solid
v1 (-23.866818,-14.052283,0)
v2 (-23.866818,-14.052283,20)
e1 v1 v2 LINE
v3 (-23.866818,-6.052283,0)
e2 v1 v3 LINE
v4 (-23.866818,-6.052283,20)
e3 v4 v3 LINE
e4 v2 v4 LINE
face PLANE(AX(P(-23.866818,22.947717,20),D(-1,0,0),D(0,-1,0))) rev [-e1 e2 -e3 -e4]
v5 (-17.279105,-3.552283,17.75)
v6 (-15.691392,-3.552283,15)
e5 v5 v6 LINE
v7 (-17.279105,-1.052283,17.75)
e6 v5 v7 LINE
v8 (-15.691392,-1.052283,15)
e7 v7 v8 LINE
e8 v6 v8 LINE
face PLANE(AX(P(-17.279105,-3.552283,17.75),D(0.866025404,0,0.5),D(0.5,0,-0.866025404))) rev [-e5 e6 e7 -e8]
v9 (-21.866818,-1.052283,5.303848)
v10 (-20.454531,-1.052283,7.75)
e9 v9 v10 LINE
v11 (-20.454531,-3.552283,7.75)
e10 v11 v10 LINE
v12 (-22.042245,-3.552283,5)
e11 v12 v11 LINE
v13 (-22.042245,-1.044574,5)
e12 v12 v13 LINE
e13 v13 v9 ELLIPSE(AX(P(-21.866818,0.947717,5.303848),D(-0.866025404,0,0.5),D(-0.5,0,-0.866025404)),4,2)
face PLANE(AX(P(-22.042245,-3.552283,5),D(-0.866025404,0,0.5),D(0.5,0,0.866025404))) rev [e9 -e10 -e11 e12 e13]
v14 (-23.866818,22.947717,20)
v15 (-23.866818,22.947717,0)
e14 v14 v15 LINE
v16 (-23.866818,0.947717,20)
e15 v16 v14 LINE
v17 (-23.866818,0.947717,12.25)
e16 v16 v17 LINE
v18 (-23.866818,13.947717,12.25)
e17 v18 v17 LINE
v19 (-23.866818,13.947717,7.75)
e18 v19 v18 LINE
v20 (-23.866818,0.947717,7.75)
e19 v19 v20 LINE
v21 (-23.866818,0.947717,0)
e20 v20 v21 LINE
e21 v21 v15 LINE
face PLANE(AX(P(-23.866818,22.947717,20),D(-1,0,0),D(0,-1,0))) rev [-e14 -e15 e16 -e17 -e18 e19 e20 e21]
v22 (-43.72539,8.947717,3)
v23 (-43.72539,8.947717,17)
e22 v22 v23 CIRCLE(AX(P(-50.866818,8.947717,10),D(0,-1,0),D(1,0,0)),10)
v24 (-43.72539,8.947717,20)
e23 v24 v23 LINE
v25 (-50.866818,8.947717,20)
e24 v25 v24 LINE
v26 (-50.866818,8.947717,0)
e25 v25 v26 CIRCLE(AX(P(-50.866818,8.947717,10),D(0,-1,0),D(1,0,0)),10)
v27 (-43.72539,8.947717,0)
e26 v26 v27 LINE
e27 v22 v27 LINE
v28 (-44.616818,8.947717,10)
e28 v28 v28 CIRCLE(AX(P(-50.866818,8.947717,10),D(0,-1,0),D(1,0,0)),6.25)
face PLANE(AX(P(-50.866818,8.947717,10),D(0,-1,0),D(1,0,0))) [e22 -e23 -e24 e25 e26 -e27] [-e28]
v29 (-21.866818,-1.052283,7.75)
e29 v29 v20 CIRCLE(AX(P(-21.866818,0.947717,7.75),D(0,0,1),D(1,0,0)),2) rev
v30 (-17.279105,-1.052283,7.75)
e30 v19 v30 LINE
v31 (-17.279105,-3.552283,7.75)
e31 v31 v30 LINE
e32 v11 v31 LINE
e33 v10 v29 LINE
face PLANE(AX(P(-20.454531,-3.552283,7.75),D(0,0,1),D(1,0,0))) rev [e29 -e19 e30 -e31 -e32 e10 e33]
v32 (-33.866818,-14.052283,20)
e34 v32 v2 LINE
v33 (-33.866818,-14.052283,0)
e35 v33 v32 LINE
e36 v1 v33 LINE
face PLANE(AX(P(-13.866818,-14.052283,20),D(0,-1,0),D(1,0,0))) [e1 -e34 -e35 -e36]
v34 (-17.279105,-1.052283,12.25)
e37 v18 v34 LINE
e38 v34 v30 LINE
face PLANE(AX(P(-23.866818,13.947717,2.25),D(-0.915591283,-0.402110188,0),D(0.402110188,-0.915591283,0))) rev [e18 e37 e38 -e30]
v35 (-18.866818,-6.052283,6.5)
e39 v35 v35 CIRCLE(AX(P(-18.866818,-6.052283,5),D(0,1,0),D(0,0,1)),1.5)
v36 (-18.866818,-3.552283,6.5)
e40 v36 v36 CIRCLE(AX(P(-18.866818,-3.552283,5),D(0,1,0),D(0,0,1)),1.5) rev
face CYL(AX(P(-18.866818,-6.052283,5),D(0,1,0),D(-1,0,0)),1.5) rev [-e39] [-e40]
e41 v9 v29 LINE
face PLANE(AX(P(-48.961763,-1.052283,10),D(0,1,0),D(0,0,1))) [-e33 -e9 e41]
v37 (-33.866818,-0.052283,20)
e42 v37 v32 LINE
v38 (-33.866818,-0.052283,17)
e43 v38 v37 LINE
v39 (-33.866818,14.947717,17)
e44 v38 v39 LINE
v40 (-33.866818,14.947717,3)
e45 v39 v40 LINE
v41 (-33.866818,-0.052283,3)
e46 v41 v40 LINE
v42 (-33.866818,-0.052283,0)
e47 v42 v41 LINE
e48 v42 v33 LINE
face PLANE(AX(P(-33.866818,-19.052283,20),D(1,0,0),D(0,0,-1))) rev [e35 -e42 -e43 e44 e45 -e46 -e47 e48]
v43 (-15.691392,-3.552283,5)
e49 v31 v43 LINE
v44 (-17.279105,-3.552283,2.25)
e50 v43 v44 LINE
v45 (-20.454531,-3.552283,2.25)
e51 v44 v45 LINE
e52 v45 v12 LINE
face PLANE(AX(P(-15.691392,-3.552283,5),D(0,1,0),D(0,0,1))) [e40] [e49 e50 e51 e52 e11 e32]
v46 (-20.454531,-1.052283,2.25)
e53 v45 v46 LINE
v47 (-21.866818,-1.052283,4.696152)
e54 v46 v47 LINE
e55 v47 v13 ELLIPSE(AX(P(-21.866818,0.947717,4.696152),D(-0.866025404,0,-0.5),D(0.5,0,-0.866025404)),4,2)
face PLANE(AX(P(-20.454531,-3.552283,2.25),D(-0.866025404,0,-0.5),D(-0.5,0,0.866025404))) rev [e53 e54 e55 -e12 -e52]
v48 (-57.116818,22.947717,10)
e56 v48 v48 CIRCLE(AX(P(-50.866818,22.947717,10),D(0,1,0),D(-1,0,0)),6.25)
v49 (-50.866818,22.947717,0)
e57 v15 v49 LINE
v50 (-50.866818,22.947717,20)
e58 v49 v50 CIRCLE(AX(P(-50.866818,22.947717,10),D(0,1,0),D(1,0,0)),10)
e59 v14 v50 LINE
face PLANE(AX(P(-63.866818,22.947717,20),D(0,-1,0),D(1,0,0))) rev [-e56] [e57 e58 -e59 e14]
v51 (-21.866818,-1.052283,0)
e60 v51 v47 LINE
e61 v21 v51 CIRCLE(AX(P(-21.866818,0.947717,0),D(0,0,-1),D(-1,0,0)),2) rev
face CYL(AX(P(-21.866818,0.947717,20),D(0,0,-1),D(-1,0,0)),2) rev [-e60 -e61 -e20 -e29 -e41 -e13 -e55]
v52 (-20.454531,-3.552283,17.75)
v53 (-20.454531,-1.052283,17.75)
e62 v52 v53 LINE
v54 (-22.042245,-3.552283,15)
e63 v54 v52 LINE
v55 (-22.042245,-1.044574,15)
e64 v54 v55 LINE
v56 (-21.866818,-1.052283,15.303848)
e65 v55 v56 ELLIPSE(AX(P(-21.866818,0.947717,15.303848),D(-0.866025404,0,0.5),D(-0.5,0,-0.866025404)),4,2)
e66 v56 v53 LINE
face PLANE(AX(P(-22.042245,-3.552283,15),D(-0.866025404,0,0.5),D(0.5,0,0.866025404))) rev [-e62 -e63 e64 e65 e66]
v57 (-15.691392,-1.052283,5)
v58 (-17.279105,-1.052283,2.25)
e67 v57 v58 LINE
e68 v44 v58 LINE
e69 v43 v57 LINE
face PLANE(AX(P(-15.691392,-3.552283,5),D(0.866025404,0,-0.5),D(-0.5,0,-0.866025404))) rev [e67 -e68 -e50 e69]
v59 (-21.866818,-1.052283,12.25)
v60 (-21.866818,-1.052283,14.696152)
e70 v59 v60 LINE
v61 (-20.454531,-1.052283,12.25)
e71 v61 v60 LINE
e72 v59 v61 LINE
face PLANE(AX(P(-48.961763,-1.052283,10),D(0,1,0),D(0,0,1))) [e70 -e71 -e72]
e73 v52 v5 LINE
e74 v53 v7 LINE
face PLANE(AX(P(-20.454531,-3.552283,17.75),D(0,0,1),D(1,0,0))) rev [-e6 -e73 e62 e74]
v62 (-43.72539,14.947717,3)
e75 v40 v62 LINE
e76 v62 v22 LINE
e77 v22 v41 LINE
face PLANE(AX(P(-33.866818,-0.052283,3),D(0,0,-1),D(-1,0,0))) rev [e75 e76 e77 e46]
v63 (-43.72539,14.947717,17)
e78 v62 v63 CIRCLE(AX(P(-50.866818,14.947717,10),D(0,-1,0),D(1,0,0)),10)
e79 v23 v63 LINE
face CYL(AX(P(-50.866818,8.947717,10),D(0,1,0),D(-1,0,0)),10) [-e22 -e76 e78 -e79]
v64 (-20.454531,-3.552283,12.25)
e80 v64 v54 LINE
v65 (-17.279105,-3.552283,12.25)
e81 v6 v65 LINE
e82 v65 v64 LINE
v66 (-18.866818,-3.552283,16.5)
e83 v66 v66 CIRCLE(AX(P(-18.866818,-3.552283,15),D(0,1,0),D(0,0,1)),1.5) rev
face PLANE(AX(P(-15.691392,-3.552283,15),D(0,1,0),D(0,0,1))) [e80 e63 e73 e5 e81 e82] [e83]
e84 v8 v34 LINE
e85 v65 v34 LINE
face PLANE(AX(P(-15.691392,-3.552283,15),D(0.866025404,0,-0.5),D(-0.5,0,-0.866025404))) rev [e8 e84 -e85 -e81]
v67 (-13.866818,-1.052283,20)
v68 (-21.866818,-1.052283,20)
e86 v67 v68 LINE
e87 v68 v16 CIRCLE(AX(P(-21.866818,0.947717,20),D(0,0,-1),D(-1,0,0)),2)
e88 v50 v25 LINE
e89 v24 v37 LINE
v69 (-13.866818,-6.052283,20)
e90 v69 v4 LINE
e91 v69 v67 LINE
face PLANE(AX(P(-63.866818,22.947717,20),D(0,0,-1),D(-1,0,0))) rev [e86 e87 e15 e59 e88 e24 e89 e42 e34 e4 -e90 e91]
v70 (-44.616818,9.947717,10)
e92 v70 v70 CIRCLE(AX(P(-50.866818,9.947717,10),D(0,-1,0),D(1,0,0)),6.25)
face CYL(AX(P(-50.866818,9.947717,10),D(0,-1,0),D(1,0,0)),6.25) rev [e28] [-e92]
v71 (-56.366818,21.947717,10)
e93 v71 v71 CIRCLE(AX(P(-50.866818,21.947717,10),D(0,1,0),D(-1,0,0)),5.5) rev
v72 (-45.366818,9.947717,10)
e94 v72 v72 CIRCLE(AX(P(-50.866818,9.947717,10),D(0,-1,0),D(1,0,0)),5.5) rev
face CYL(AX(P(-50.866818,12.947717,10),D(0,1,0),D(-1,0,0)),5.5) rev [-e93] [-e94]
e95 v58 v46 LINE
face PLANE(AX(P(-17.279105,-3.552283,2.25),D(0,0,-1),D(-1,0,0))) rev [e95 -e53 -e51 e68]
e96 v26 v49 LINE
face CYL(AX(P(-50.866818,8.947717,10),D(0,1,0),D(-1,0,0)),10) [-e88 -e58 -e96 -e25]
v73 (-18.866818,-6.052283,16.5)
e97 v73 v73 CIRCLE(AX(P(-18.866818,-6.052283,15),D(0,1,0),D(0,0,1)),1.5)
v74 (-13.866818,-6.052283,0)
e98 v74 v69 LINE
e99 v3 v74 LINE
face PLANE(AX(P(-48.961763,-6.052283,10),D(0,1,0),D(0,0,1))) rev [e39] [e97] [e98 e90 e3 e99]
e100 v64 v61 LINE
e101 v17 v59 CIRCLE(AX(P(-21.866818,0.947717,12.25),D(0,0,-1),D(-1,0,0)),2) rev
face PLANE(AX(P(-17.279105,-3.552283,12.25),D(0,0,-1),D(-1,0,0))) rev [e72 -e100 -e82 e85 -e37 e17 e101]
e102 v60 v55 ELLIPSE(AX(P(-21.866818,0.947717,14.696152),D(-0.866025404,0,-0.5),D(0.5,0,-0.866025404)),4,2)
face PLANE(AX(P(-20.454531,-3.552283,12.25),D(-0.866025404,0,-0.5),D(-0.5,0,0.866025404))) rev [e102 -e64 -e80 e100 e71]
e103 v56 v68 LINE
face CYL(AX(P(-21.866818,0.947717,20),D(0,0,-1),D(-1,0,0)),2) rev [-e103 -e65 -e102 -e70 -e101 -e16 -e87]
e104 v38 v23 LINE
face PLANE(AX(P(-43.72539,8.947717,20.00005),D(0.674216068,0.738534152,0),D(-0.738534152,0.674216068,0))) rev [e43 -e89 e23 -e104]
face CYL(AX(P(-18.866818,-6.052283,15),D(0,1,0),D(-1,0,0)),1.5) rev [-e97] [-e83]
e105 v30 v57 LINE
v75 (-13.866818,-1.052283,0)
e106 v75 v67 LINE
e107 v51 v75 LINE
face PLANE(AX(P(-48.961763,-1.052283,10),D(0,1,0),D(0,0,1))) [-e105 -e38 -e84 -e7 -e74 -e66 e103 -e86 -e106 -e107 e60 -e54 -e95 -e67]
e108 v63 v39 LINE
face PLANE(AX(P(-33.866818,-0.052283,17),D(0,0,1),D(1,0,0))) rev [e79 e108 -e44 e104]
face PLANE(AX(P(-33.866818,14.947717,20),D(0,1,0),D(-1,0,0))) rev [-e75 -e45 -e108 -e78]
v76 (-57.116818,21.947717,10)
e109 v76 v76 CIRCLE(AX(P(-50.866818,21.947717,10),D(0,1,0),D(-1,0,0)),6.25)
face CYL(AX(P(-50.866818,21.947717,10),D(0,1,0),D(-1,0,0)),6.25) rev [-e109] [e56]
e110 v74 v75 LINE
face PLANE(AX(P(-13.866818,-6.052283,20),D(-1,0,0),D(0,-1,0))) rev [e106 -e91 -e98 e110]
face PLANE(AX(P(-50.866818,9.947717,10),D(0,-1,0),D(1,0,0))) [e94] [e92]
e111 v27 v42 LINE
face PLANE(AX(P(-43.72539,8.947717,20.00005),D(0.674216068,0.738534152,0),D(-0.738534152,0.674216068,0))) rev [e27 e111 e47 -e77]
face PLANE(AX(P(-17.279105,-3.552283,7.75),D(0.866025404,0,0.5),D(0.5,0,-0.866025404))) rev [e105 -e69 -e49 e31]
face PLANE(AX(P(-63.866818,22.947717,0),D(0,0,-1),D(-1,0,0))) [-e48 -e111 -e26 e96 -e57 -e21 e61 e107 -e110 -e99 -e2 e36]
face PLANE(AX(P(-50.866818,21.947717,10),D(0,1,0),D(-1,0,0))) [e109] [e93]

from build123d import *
from build123d.topology import SkipClean

# Parameters (mm, degrees)
EXTRUDE_1_DEPTH           = 20
SKETCH_3_R                = 5.5
CUT_EXTRUDE_2_DEPTH       = 10
SKETCH_9_R                = 6.25
CUT_EXTRUDE_6_DEPTH       = 1
SKETCH_11_W               = 20
SKETCH_11_H               = 5
EXTRUDE_4_DEPTH           = 10
CUT_EXTRUDE_8_REACH       = 78.472
SKETCH_12_R               = 1.5
SKETCH_13_R               = 3
CUT_EXTRUDE_9_DEPTH       = 2.5
SKETCH_14_R               = 10
SKETCH_14_R_2             = 5.5
EXTRUDE_5_DEPTH           = 6
CUT_EXTRUDE_START         = -1
SKETCH_6_R                = 6.25
CUT_EXTRUDE_10_DEPTH      = 1
SKETCH_15_W               = 20
SKETCH_15_H               = 5
EXTRUDE_6_DEPTH           = 5
SKETCH_16_W               = 17
SKETCH_16_H               = 3
EXTRUDE_7_DEPTH           = 15
CUT_EXTRUDE_11_DEPTH      = 70.961190435
CUT_EXTRUDE_11_DEPTH_BACK = 70.961190435
EXTRUDE_START             = -5
SKETCH_3D_3_R             = 1.5
EXTRUDE_8_DEPTH           = 5
CUT_EXTRUDE_12_DEPTH      = 2.5
FILLET_1_R                = 2
CUT_EXTRUDE_14_DEPTH      = 76.06644022
SKETCH_21_W               = 6.587713241
SKETCH_21_H               = 4.5
EXTRUDE_9_DEPTH           = 15
SKETCH_23_W               = 25
SKETCH_23_H               = 20
CUT_EXTRUDE_16_DEPTH      = 5
CUT_EXTRUDE_17_DEPTH      = 10


with BuildPart() as part:
    # 草图1 → 凸台-拉伸1 (new body)
    with BuildSketch(Plane.XY):
        Polygon((-63.866818046, 22.947717095), (-23.866818046, 22.947717095), (-23.866818046, -19.052282905), (-33.866818046, -19.052282905), (-33.866818046, 14.947717095), (-63.866818046, 14.947717095), align=None)
    extrude(amount=EXTRUDE_1_DEPTH)

    # 草图3 → 切除-拉伸2 (cut)
    with BuildSketch(Plane(origin=(0, 22.947717095, 0), x_dir=(-1, 0, 0), z_dir=(0, 1, 0))):
        with Locations((50.866818046, 10)):
            Circle(SKETCH_3_R)
    extrude(amount=-CUT_EXTRUDE_2_DEPTH, mode=Mode.SUBTRACT)

    # 草图9 → 切除-拉伸6 (cut)
    with BuildSketch(Plane(origin=(0, 22.947717095, 0), x_dir=(1, 0, 0), z_dir=(0, 1, 0))):
        with Locations(Location((-50.866818046, -10, 0), (0, 0, 180))):
            Circle(SKETCH_9_R)
    extrude(amount=-CUT_EXTRUDE_6_DEPTH, mode=Mode.SUBTRACT)

    # 草图11 → 凸台-拉伸4 (add)
    with BuildSketch(Plane(origin=(-23.866818046, 0, 0), x_dir=(0, 0, -1), z_dir=(1, 0, 0))):
        with Locations((-10, -16.552282905)):
            Rectangle(SKETCH_11_W, SKETCH_11_H)
    extrude(amount=EXTRUDE_4_DEPTH)

    # 草图12 → 切除-拉伸8 (cut, up to next)
    with BuildSketch(Plane(origin=(0, -14.052282905, 0), x_dir=(-1, 0, 0), z_dir=(0, 1, 0)), mode=Mode.PRIVATE) as cut_extrude_8_sk1:
        with Locations((18.866818046, 5)):
            Circle(SKETCH_12_R)
    cut_extrude_8_tool1 = extrude(cut_extrude_8_sk1.sketch, amount=-CUT_EXTRUDE_8_REACH, mode=Mode.PRIVATE) & part.part
    # 草图12 → 切除-拉伸8 (cut, up to next)
    with BuildSketch(Plane(origin=(0, -14.052282905, 0), x_dir=(-1, 0, 0), z_dir=(0, 1, 0)), mode=Mode.PRIVATE) as cut_extrude_8_sk2:
        with Locations((18.866818046, 15)):
            Circle(SKETCH_12_R)
    cut_extrude_8_tool2 = extrude(cut_extrude_8_sk2.sketch, amount=-CUT_EXTRUDE_8_REACH, mode=Mode.PRIVATE) & part.part
    add(cut_extrude_8_tool1.solids().sort_by_distance((-18.866818, -14.052283, 5))[0], mode=Mode.SUBTRACT)
    add(cut_extrude_8_tool2.solids().sort_by_distance((-18.866818, -14.052283, 15))[0], mode=Mode.SUBTRACT)

    # 草图13 → 切除-拉伸9 (cut)
    with BuildSketch(Plane.XZ.offset(19.052282905)):
        with Locations(Location((-18.866818046, 15, 0), (0, 0, 270))):
            Circle(SKETCH_13_R)
        with Locations(Location((-18.866818046, 5, 0), (0, 0, 270))):
            Circle(SKETCH_13_R)
    extrude(amount=-CUT_EXTRUDE_9_DEPTH, mode=Mode.SUBTRACT)

    # 草图14 → 凸台-拉伸5 (add)
    with SkipClean():  # the faces are left unmerged after this step: merging them gives an invalid solid
        with BuildSketch(Plane.XZ.offset(-14.947717095)):
            with Locations(Location((-50.866818046, 10, 0), (0, 0, 270))):
                Circle(SKETCH_14_R)
            with Locations(Location((-50.866818046, 10, 0), (0, 0, 180))):
                Circle(SKETCH_14_R_2, mode=Mode.SUBTRACT)
        extrude(amount=EXTRUDE_5_DEPTH)

    # 草图6 → 切除-拉伸10 (cut)
    with BuildSketch(Plane.XZ.offset(-8.947717095).offset(CUT_EXTRUDE_START)):
        with Locations(Location((-50.866818046, 10, 0), (0, 0, 180))):
            Circle(SKETCH_6_R)
    extrude(amount=CUT_EXTRUDE_10_DEPTH, mode=Mode.SUBTRACT)

    # 草图15 → 凸台-拉伸6 (add)
    with BuildSketch(Plane(origin=(-13.866818046, 0, 0), x_dir=(0, 0, -1), z_dir=(1, 0, 0))):
        with Locations((-10, -16.552282905)):
            Rectangle(SKETCH_15_W, SKETCH_15_H)
    extrude(amount=EXTRUDE_6_DEPTH)

    # 草图16 → 凸台-拉伸7 (add)
    with BuildSketch(Plane.XZ.offset(-14.947717095)):
        with Locations((-42.366818046, 18.5)):
            Rectangle(SKETCH_16_W, SKETCH_16_H)
        with Locations((-42.366818046, 1.5)):
            Rectangle(SKETCH_16_W, SKETCH_16_H)
    extrude(amount=EXTRUDE_7_DEPTH)

    # 草图17 → 切除-拉伸11 (cut, two sides: drawn at the far end of the back side and taken through both)
    with BuildSketch(Plane(origin=(0, 0, 17), x_dir=(-1, 0, 0), z_dir=(0, 0, -1)).offset(-CUT_EXTRUDE_11_DEPTH_BACK)):
        Polygon((50.866818046, 8.947717095), (43.725389617, 8.947717095), (33.866818046, -0.052282905), (50.866818046, -0.052282905), align=None)
    extrude(amount=CUT_EXTRUDE_11_DEPTH + CUT_EXTRUDE_11_DEPTH_BACK, mode=Mode.SUBTRACT)

    # Sketch 3D_3 → 凸台-拉伸8 (add)
    with BuildSketch(Plane(origin=(-23.866818046, -6.052282905, 20), x_dir=(0.447213595499958, 0, -0.894427190999916), z_dir=(0, -1, 0)).offset(EXTRUDE_START)):
        Polygon((0, 0), (4.472135955, 8.94427191), (22.360679775, 0), (17.88854382, -8.94427191), align=None)
        with Locations(Location((6.708203932, 2.236067977, 0), (0, 0, 243.434948823))):
            Circle(SKETCH_3D_3_R, mode=Mode.SUBTRACT)
        with Locations(Location((15.652475842, -2.236067977, 0), (0, 0, 243.434948823))):
            Circle(SKETCH_3D_3_R, mode=Mode.SUBTRACT)
    extrude(amount=EXTRUDE_8_DEPTH)

    # 草图18 → 切除-拉伸12 (cut)
    with BuildSketch(Plane(origin=(0, -1.052282905, 0), x_dir=(-1, 0, 0), z_dir=(0, 1, 0))):
        Polygon((15.691391565, 15), (17.279104805, 12.25), (20.454531286, 12.25), (22.042244526, 15), (20.454531286, 17.75), (17.279104805, 17.75), align=None)
        Polygon((15.691391565, 5), (17.279104805, 2.25), (20.454531286, 2.25), (22.042244526, 5), (20.454531286, 7.75), (17.279104805, 7.75), align=None)
    extrude(amount=-CUT_EXTRUDE_12_DEPTH, mode=Mode.SUBTRACT)

    # 圆角1
    # the kernel refuses this fillet: 2 mm, written as the material it adds along each edge
    with BuildSketch(Plane(origin=(-23.866818046, -1.052282905, 0), x_dir=(0, 1, 0), z_dir=(0, 0, 1))) as fillet_1_piece_1_section:
        with BuildLine():
            CenterArc((FILLET_1_R, -FILLET_1_R), FILLET_1_R, 90, 90)
            Line((0, -FILLET_1_R), (0, 0))
            Line((0, 0), (FILLET_1_R, 0))
        make_face()
    fillet_1_piece_1 = extrude(amount=20, mode=Mode.PRIVATE)
    fillet_1_piece_1 = split(fillet_1_piece_1, bisect_by=Plane(origin=(-20.802583542, -0.671658343, 2.852844192), z_dir=(-0.8660254037844387, 0, -0.5000000000000001)), keep=Keep.TOP, mode=Mode.PRIVATE)
    fillet_1_piece_1 = split(fillet_1_piece_1, bisect_by=Plane(origin=(-23.907001975, -0.671658343, 1.770145354), z_dir=(0.8660254037844387, 0, -0.5000000000000003)), keep=Keep.TOP, mode=Mode.PRIVATE)
    add(fillet_1_piece_1)
    with BuildSketch(Plane(origin=(-23.866818046, -1.052282905, 0), x_dir=(0, 1, 0), z_dir=(0, 0, 1))) as fillet_1_piece_2_section:
        with BuildLine():
            CenterArc((FILLET_1_R, -FILLET_1_R), FILLET_1_R, 90, 90)
            Line((0, -FILLET_1_R), (0, 0))
            Line((0, 0), (FILLET_1_R, 0))
        make_face()
    fillet_1_piece_2 = extrude(amount=20, mode=Mode.PRIVATE)
    fillet_1_piece_2 = split(fillet_1_piece_2, bisect_by=Plane(origin=(-22.4188867, -0.519681884, 5.652363381), z_dir=(-0.8660254037844387, 0, -0.5000000000000001)), keep=Keep.TOP, mode=Mode.PRIVATE)
    fillet_1_piece_2 = split(fillet_1_piece_2, bisect_by=Plane(origin=(-22.4188867, -0.519681884, 4.347636619), z_dir=(-0.8660254037844387, 0, 0.5000000000000003)), keep=Keep.TOP, mode=Mode.PRIVATE)
    add(fillet_1_piece_2)
    with BuildSketch(Plane(origin=(-23.866818046, -1.052282905, 0), x_dir=(0, 1, 0), z_dir=(0, 0, 1))) as fillet_1_piece_3_section:
        with BuildLine():
            CenterArc((FILLET_1_R, -FILLET_1_R), FILLET_1_R, 90, 90)
            Line((0, -FILLET_1_R), (0, 0))
            Line((0, 0), (FILLET_1_R, 0))
        make_face()
    fillet_1_piece_3 = extrude(amount=20, mode=Mode.PRIVATE)
    fillet_1_piece_3 = split(fillet_1_piece_3, bisect_by=Plane(origin=(-24.519856268, -0.671658343, 9.291349419), z_dir=(0.8660254037844387, 0, 0.5000000000000001)), keep=Keep.TOP, mode=Mode.PRIVATE)
    fillet_1_piece_3 = split(fillet_1_piece_3, bisect_by=Plane(origin=(-20.189729249, -0.671658343, 8.208650581), z_dir=(-0.8660254037844387, 0, 0.5000000000000003)), keep=Keep.TOP, mode=Mode.PRIVATE)
    fillet_1_piece_3 = split(fillet_1_piece_3, bisect_by=Plane(origin=(-20.189729249, -0.671658343, 11.791349419), z_dir=(-0.8660254037844387, 0, -0.5)), keep=Keep.TOP, mode=Mode.PRIVATE)
    fillet_1_piece_3 = split(fillet_1_piece_3, bisect_by=Plane(origin=(-24.519856268, -0.671658343, 10.708650581), z_dir=(0.8660254037844384, 0, -0.5000000000000004)), keep=Keep.TOP, mode=Mode.PRIVATE)
    add(fillet_1_piece_3)
    with BuildSketch(Plane(origin=(-23.866818046, -1.052282905, 0), x_dir=(0, 1, 0), z_dir=(0, 0, 1))) as fillet_1_piece_4_section:
        with BuildLine():
            CenterArc((FILLET_1_R, -FILLET_1_R), FILLET_1_R, 90, 90)
            Line((0, -FILLET_1_R), (0, 0))
            Line((0, 0), (FILLET_1_R, 0))
        make_face()
    fillet_1_piece_4 = extrude(amount=20, mode=Mode.PRIVATE)
    fillet_1_piece_4 = split(fillet_1_piece_4, bisect_by=Plane(origin=(-22.4188867, -0.519681884, 15.652363381), z_dir=(-0.8660254037844387, 0, -0.5)), keep=Keep.TOP, mode=Mode.PRIVATE)
    fillet_1_piece_4 = split(fillet_1_piece_4, bisect_by=Plane(origin=(-22.4188867, -0.519681884, 14.347636619), z_dir=(-0.8660254037844384, 0, 0.5000000000000004)), keep=Keep.TOP, mode=Mode.PRIVATE)
    add(fillet_1_piece_4)
    with BuildSketch(Plane(origin=(-23.866818046, -1.052282905, 0), x_dir=(0, 1, 0), z_dir=(0, 0, 1))) as fillet_1_piece_5_section:
        with BuildLine():
            CenterArc((FILLET_1_R, -FILLET_1_R), FILLET_1_R, 90, 90)
            Line((0, -FILLET_1_R), (0, 0))
            Line((0, 0), (FILLET_1_R, 0))
        make_face()
    fillet_1_piece_5 = extrude(amount=20, mode=Mode.PRIVATE)
    fillet_1_piece_5 = split(fillet_1_piece_5, bisect_by=Plane(origin=(-23.907001975, -0.671658343, 18.229854646), z_dir=(0.8660254037844387, 0, 0.5)), keep=Keep.TOP, mode=Mode.PRIVATE)
    fillet_1_piece_5 = split(fillet_1_piece_5, bisect_by=Plane(origin=(-20.802583542, -0.671658343, 17.147155808), z_dir=(-0.8660254037844384, 0, 0.5000000000000004)), keep=Keep.TOP, mode=Mode.PRIVATE)
    add(fillet_1_piece_5)

    # 草图20 → 切除-拉伸14 (cut, through all)
    with SkipClean():  # the faces are left unmerged after this step: merging them gives an invalid solid
        with BuildSketch(Plane.XZ.offset(-14.947717095)):
            with BuildLine():
                Line((-63.866818046, 20), (-50.866818046, 20))
                ThreePointArc((-50.866818046, 20), (-60.866818046, 10), (-50.866818046, 0))
                Line((-50.866818046, 0), (-63.866818046, 0))
                Line((-63.866818046, 0), (-63.866818046, 20))
            make_face()
        extrude(amount=-CUT_EXTRUDE_14_DEPTH, mode=Mode.SUBTRACT)
    add(part.part.scale(1), mode=Mode.REPLACE)  # the faces are merged on a copy

    # 草图21 → 凸台-拉伸9 (add)
    with BuildSketch(Plane(origin=(0, -1.052282905, 0), x_dir=(1, 0, 0), z_dir=(0, 1, 0))):
        with Locations((-20.572961426, -10)):
            Rectangle(SKETCH_21_W, SKETCH_21_H)
    extrude(amount=EXTRUDE_9_DEPTH)

    # 草图23 → 切除-拉伸16 (cut)
    with BuildSketch(Plane.XZ.offset(19.052282905)):
        with Locations((-21.366818046, 10)):
            Rectangle(SKETCH_23_W, SKETCH_23_H)
    extrude(amount=-CUT_EXTRUDE_16_DEPTH, mode=Mode.SUBTRACT)

    # 草图24 → 切除-拉伸17 (cut)
    with BuildSketch(Plane.XY.offset(12.25)):
        Polygon((-23.866818046, 13.947717095), (-17.279104805, -1.052282905), (-17.279104805, 13.947717095), align=None)
    extrude(amount=-CUT_EXTRUDE_17_DEPTH, mode=Mode.SUBTRACT)


solid = part.part
